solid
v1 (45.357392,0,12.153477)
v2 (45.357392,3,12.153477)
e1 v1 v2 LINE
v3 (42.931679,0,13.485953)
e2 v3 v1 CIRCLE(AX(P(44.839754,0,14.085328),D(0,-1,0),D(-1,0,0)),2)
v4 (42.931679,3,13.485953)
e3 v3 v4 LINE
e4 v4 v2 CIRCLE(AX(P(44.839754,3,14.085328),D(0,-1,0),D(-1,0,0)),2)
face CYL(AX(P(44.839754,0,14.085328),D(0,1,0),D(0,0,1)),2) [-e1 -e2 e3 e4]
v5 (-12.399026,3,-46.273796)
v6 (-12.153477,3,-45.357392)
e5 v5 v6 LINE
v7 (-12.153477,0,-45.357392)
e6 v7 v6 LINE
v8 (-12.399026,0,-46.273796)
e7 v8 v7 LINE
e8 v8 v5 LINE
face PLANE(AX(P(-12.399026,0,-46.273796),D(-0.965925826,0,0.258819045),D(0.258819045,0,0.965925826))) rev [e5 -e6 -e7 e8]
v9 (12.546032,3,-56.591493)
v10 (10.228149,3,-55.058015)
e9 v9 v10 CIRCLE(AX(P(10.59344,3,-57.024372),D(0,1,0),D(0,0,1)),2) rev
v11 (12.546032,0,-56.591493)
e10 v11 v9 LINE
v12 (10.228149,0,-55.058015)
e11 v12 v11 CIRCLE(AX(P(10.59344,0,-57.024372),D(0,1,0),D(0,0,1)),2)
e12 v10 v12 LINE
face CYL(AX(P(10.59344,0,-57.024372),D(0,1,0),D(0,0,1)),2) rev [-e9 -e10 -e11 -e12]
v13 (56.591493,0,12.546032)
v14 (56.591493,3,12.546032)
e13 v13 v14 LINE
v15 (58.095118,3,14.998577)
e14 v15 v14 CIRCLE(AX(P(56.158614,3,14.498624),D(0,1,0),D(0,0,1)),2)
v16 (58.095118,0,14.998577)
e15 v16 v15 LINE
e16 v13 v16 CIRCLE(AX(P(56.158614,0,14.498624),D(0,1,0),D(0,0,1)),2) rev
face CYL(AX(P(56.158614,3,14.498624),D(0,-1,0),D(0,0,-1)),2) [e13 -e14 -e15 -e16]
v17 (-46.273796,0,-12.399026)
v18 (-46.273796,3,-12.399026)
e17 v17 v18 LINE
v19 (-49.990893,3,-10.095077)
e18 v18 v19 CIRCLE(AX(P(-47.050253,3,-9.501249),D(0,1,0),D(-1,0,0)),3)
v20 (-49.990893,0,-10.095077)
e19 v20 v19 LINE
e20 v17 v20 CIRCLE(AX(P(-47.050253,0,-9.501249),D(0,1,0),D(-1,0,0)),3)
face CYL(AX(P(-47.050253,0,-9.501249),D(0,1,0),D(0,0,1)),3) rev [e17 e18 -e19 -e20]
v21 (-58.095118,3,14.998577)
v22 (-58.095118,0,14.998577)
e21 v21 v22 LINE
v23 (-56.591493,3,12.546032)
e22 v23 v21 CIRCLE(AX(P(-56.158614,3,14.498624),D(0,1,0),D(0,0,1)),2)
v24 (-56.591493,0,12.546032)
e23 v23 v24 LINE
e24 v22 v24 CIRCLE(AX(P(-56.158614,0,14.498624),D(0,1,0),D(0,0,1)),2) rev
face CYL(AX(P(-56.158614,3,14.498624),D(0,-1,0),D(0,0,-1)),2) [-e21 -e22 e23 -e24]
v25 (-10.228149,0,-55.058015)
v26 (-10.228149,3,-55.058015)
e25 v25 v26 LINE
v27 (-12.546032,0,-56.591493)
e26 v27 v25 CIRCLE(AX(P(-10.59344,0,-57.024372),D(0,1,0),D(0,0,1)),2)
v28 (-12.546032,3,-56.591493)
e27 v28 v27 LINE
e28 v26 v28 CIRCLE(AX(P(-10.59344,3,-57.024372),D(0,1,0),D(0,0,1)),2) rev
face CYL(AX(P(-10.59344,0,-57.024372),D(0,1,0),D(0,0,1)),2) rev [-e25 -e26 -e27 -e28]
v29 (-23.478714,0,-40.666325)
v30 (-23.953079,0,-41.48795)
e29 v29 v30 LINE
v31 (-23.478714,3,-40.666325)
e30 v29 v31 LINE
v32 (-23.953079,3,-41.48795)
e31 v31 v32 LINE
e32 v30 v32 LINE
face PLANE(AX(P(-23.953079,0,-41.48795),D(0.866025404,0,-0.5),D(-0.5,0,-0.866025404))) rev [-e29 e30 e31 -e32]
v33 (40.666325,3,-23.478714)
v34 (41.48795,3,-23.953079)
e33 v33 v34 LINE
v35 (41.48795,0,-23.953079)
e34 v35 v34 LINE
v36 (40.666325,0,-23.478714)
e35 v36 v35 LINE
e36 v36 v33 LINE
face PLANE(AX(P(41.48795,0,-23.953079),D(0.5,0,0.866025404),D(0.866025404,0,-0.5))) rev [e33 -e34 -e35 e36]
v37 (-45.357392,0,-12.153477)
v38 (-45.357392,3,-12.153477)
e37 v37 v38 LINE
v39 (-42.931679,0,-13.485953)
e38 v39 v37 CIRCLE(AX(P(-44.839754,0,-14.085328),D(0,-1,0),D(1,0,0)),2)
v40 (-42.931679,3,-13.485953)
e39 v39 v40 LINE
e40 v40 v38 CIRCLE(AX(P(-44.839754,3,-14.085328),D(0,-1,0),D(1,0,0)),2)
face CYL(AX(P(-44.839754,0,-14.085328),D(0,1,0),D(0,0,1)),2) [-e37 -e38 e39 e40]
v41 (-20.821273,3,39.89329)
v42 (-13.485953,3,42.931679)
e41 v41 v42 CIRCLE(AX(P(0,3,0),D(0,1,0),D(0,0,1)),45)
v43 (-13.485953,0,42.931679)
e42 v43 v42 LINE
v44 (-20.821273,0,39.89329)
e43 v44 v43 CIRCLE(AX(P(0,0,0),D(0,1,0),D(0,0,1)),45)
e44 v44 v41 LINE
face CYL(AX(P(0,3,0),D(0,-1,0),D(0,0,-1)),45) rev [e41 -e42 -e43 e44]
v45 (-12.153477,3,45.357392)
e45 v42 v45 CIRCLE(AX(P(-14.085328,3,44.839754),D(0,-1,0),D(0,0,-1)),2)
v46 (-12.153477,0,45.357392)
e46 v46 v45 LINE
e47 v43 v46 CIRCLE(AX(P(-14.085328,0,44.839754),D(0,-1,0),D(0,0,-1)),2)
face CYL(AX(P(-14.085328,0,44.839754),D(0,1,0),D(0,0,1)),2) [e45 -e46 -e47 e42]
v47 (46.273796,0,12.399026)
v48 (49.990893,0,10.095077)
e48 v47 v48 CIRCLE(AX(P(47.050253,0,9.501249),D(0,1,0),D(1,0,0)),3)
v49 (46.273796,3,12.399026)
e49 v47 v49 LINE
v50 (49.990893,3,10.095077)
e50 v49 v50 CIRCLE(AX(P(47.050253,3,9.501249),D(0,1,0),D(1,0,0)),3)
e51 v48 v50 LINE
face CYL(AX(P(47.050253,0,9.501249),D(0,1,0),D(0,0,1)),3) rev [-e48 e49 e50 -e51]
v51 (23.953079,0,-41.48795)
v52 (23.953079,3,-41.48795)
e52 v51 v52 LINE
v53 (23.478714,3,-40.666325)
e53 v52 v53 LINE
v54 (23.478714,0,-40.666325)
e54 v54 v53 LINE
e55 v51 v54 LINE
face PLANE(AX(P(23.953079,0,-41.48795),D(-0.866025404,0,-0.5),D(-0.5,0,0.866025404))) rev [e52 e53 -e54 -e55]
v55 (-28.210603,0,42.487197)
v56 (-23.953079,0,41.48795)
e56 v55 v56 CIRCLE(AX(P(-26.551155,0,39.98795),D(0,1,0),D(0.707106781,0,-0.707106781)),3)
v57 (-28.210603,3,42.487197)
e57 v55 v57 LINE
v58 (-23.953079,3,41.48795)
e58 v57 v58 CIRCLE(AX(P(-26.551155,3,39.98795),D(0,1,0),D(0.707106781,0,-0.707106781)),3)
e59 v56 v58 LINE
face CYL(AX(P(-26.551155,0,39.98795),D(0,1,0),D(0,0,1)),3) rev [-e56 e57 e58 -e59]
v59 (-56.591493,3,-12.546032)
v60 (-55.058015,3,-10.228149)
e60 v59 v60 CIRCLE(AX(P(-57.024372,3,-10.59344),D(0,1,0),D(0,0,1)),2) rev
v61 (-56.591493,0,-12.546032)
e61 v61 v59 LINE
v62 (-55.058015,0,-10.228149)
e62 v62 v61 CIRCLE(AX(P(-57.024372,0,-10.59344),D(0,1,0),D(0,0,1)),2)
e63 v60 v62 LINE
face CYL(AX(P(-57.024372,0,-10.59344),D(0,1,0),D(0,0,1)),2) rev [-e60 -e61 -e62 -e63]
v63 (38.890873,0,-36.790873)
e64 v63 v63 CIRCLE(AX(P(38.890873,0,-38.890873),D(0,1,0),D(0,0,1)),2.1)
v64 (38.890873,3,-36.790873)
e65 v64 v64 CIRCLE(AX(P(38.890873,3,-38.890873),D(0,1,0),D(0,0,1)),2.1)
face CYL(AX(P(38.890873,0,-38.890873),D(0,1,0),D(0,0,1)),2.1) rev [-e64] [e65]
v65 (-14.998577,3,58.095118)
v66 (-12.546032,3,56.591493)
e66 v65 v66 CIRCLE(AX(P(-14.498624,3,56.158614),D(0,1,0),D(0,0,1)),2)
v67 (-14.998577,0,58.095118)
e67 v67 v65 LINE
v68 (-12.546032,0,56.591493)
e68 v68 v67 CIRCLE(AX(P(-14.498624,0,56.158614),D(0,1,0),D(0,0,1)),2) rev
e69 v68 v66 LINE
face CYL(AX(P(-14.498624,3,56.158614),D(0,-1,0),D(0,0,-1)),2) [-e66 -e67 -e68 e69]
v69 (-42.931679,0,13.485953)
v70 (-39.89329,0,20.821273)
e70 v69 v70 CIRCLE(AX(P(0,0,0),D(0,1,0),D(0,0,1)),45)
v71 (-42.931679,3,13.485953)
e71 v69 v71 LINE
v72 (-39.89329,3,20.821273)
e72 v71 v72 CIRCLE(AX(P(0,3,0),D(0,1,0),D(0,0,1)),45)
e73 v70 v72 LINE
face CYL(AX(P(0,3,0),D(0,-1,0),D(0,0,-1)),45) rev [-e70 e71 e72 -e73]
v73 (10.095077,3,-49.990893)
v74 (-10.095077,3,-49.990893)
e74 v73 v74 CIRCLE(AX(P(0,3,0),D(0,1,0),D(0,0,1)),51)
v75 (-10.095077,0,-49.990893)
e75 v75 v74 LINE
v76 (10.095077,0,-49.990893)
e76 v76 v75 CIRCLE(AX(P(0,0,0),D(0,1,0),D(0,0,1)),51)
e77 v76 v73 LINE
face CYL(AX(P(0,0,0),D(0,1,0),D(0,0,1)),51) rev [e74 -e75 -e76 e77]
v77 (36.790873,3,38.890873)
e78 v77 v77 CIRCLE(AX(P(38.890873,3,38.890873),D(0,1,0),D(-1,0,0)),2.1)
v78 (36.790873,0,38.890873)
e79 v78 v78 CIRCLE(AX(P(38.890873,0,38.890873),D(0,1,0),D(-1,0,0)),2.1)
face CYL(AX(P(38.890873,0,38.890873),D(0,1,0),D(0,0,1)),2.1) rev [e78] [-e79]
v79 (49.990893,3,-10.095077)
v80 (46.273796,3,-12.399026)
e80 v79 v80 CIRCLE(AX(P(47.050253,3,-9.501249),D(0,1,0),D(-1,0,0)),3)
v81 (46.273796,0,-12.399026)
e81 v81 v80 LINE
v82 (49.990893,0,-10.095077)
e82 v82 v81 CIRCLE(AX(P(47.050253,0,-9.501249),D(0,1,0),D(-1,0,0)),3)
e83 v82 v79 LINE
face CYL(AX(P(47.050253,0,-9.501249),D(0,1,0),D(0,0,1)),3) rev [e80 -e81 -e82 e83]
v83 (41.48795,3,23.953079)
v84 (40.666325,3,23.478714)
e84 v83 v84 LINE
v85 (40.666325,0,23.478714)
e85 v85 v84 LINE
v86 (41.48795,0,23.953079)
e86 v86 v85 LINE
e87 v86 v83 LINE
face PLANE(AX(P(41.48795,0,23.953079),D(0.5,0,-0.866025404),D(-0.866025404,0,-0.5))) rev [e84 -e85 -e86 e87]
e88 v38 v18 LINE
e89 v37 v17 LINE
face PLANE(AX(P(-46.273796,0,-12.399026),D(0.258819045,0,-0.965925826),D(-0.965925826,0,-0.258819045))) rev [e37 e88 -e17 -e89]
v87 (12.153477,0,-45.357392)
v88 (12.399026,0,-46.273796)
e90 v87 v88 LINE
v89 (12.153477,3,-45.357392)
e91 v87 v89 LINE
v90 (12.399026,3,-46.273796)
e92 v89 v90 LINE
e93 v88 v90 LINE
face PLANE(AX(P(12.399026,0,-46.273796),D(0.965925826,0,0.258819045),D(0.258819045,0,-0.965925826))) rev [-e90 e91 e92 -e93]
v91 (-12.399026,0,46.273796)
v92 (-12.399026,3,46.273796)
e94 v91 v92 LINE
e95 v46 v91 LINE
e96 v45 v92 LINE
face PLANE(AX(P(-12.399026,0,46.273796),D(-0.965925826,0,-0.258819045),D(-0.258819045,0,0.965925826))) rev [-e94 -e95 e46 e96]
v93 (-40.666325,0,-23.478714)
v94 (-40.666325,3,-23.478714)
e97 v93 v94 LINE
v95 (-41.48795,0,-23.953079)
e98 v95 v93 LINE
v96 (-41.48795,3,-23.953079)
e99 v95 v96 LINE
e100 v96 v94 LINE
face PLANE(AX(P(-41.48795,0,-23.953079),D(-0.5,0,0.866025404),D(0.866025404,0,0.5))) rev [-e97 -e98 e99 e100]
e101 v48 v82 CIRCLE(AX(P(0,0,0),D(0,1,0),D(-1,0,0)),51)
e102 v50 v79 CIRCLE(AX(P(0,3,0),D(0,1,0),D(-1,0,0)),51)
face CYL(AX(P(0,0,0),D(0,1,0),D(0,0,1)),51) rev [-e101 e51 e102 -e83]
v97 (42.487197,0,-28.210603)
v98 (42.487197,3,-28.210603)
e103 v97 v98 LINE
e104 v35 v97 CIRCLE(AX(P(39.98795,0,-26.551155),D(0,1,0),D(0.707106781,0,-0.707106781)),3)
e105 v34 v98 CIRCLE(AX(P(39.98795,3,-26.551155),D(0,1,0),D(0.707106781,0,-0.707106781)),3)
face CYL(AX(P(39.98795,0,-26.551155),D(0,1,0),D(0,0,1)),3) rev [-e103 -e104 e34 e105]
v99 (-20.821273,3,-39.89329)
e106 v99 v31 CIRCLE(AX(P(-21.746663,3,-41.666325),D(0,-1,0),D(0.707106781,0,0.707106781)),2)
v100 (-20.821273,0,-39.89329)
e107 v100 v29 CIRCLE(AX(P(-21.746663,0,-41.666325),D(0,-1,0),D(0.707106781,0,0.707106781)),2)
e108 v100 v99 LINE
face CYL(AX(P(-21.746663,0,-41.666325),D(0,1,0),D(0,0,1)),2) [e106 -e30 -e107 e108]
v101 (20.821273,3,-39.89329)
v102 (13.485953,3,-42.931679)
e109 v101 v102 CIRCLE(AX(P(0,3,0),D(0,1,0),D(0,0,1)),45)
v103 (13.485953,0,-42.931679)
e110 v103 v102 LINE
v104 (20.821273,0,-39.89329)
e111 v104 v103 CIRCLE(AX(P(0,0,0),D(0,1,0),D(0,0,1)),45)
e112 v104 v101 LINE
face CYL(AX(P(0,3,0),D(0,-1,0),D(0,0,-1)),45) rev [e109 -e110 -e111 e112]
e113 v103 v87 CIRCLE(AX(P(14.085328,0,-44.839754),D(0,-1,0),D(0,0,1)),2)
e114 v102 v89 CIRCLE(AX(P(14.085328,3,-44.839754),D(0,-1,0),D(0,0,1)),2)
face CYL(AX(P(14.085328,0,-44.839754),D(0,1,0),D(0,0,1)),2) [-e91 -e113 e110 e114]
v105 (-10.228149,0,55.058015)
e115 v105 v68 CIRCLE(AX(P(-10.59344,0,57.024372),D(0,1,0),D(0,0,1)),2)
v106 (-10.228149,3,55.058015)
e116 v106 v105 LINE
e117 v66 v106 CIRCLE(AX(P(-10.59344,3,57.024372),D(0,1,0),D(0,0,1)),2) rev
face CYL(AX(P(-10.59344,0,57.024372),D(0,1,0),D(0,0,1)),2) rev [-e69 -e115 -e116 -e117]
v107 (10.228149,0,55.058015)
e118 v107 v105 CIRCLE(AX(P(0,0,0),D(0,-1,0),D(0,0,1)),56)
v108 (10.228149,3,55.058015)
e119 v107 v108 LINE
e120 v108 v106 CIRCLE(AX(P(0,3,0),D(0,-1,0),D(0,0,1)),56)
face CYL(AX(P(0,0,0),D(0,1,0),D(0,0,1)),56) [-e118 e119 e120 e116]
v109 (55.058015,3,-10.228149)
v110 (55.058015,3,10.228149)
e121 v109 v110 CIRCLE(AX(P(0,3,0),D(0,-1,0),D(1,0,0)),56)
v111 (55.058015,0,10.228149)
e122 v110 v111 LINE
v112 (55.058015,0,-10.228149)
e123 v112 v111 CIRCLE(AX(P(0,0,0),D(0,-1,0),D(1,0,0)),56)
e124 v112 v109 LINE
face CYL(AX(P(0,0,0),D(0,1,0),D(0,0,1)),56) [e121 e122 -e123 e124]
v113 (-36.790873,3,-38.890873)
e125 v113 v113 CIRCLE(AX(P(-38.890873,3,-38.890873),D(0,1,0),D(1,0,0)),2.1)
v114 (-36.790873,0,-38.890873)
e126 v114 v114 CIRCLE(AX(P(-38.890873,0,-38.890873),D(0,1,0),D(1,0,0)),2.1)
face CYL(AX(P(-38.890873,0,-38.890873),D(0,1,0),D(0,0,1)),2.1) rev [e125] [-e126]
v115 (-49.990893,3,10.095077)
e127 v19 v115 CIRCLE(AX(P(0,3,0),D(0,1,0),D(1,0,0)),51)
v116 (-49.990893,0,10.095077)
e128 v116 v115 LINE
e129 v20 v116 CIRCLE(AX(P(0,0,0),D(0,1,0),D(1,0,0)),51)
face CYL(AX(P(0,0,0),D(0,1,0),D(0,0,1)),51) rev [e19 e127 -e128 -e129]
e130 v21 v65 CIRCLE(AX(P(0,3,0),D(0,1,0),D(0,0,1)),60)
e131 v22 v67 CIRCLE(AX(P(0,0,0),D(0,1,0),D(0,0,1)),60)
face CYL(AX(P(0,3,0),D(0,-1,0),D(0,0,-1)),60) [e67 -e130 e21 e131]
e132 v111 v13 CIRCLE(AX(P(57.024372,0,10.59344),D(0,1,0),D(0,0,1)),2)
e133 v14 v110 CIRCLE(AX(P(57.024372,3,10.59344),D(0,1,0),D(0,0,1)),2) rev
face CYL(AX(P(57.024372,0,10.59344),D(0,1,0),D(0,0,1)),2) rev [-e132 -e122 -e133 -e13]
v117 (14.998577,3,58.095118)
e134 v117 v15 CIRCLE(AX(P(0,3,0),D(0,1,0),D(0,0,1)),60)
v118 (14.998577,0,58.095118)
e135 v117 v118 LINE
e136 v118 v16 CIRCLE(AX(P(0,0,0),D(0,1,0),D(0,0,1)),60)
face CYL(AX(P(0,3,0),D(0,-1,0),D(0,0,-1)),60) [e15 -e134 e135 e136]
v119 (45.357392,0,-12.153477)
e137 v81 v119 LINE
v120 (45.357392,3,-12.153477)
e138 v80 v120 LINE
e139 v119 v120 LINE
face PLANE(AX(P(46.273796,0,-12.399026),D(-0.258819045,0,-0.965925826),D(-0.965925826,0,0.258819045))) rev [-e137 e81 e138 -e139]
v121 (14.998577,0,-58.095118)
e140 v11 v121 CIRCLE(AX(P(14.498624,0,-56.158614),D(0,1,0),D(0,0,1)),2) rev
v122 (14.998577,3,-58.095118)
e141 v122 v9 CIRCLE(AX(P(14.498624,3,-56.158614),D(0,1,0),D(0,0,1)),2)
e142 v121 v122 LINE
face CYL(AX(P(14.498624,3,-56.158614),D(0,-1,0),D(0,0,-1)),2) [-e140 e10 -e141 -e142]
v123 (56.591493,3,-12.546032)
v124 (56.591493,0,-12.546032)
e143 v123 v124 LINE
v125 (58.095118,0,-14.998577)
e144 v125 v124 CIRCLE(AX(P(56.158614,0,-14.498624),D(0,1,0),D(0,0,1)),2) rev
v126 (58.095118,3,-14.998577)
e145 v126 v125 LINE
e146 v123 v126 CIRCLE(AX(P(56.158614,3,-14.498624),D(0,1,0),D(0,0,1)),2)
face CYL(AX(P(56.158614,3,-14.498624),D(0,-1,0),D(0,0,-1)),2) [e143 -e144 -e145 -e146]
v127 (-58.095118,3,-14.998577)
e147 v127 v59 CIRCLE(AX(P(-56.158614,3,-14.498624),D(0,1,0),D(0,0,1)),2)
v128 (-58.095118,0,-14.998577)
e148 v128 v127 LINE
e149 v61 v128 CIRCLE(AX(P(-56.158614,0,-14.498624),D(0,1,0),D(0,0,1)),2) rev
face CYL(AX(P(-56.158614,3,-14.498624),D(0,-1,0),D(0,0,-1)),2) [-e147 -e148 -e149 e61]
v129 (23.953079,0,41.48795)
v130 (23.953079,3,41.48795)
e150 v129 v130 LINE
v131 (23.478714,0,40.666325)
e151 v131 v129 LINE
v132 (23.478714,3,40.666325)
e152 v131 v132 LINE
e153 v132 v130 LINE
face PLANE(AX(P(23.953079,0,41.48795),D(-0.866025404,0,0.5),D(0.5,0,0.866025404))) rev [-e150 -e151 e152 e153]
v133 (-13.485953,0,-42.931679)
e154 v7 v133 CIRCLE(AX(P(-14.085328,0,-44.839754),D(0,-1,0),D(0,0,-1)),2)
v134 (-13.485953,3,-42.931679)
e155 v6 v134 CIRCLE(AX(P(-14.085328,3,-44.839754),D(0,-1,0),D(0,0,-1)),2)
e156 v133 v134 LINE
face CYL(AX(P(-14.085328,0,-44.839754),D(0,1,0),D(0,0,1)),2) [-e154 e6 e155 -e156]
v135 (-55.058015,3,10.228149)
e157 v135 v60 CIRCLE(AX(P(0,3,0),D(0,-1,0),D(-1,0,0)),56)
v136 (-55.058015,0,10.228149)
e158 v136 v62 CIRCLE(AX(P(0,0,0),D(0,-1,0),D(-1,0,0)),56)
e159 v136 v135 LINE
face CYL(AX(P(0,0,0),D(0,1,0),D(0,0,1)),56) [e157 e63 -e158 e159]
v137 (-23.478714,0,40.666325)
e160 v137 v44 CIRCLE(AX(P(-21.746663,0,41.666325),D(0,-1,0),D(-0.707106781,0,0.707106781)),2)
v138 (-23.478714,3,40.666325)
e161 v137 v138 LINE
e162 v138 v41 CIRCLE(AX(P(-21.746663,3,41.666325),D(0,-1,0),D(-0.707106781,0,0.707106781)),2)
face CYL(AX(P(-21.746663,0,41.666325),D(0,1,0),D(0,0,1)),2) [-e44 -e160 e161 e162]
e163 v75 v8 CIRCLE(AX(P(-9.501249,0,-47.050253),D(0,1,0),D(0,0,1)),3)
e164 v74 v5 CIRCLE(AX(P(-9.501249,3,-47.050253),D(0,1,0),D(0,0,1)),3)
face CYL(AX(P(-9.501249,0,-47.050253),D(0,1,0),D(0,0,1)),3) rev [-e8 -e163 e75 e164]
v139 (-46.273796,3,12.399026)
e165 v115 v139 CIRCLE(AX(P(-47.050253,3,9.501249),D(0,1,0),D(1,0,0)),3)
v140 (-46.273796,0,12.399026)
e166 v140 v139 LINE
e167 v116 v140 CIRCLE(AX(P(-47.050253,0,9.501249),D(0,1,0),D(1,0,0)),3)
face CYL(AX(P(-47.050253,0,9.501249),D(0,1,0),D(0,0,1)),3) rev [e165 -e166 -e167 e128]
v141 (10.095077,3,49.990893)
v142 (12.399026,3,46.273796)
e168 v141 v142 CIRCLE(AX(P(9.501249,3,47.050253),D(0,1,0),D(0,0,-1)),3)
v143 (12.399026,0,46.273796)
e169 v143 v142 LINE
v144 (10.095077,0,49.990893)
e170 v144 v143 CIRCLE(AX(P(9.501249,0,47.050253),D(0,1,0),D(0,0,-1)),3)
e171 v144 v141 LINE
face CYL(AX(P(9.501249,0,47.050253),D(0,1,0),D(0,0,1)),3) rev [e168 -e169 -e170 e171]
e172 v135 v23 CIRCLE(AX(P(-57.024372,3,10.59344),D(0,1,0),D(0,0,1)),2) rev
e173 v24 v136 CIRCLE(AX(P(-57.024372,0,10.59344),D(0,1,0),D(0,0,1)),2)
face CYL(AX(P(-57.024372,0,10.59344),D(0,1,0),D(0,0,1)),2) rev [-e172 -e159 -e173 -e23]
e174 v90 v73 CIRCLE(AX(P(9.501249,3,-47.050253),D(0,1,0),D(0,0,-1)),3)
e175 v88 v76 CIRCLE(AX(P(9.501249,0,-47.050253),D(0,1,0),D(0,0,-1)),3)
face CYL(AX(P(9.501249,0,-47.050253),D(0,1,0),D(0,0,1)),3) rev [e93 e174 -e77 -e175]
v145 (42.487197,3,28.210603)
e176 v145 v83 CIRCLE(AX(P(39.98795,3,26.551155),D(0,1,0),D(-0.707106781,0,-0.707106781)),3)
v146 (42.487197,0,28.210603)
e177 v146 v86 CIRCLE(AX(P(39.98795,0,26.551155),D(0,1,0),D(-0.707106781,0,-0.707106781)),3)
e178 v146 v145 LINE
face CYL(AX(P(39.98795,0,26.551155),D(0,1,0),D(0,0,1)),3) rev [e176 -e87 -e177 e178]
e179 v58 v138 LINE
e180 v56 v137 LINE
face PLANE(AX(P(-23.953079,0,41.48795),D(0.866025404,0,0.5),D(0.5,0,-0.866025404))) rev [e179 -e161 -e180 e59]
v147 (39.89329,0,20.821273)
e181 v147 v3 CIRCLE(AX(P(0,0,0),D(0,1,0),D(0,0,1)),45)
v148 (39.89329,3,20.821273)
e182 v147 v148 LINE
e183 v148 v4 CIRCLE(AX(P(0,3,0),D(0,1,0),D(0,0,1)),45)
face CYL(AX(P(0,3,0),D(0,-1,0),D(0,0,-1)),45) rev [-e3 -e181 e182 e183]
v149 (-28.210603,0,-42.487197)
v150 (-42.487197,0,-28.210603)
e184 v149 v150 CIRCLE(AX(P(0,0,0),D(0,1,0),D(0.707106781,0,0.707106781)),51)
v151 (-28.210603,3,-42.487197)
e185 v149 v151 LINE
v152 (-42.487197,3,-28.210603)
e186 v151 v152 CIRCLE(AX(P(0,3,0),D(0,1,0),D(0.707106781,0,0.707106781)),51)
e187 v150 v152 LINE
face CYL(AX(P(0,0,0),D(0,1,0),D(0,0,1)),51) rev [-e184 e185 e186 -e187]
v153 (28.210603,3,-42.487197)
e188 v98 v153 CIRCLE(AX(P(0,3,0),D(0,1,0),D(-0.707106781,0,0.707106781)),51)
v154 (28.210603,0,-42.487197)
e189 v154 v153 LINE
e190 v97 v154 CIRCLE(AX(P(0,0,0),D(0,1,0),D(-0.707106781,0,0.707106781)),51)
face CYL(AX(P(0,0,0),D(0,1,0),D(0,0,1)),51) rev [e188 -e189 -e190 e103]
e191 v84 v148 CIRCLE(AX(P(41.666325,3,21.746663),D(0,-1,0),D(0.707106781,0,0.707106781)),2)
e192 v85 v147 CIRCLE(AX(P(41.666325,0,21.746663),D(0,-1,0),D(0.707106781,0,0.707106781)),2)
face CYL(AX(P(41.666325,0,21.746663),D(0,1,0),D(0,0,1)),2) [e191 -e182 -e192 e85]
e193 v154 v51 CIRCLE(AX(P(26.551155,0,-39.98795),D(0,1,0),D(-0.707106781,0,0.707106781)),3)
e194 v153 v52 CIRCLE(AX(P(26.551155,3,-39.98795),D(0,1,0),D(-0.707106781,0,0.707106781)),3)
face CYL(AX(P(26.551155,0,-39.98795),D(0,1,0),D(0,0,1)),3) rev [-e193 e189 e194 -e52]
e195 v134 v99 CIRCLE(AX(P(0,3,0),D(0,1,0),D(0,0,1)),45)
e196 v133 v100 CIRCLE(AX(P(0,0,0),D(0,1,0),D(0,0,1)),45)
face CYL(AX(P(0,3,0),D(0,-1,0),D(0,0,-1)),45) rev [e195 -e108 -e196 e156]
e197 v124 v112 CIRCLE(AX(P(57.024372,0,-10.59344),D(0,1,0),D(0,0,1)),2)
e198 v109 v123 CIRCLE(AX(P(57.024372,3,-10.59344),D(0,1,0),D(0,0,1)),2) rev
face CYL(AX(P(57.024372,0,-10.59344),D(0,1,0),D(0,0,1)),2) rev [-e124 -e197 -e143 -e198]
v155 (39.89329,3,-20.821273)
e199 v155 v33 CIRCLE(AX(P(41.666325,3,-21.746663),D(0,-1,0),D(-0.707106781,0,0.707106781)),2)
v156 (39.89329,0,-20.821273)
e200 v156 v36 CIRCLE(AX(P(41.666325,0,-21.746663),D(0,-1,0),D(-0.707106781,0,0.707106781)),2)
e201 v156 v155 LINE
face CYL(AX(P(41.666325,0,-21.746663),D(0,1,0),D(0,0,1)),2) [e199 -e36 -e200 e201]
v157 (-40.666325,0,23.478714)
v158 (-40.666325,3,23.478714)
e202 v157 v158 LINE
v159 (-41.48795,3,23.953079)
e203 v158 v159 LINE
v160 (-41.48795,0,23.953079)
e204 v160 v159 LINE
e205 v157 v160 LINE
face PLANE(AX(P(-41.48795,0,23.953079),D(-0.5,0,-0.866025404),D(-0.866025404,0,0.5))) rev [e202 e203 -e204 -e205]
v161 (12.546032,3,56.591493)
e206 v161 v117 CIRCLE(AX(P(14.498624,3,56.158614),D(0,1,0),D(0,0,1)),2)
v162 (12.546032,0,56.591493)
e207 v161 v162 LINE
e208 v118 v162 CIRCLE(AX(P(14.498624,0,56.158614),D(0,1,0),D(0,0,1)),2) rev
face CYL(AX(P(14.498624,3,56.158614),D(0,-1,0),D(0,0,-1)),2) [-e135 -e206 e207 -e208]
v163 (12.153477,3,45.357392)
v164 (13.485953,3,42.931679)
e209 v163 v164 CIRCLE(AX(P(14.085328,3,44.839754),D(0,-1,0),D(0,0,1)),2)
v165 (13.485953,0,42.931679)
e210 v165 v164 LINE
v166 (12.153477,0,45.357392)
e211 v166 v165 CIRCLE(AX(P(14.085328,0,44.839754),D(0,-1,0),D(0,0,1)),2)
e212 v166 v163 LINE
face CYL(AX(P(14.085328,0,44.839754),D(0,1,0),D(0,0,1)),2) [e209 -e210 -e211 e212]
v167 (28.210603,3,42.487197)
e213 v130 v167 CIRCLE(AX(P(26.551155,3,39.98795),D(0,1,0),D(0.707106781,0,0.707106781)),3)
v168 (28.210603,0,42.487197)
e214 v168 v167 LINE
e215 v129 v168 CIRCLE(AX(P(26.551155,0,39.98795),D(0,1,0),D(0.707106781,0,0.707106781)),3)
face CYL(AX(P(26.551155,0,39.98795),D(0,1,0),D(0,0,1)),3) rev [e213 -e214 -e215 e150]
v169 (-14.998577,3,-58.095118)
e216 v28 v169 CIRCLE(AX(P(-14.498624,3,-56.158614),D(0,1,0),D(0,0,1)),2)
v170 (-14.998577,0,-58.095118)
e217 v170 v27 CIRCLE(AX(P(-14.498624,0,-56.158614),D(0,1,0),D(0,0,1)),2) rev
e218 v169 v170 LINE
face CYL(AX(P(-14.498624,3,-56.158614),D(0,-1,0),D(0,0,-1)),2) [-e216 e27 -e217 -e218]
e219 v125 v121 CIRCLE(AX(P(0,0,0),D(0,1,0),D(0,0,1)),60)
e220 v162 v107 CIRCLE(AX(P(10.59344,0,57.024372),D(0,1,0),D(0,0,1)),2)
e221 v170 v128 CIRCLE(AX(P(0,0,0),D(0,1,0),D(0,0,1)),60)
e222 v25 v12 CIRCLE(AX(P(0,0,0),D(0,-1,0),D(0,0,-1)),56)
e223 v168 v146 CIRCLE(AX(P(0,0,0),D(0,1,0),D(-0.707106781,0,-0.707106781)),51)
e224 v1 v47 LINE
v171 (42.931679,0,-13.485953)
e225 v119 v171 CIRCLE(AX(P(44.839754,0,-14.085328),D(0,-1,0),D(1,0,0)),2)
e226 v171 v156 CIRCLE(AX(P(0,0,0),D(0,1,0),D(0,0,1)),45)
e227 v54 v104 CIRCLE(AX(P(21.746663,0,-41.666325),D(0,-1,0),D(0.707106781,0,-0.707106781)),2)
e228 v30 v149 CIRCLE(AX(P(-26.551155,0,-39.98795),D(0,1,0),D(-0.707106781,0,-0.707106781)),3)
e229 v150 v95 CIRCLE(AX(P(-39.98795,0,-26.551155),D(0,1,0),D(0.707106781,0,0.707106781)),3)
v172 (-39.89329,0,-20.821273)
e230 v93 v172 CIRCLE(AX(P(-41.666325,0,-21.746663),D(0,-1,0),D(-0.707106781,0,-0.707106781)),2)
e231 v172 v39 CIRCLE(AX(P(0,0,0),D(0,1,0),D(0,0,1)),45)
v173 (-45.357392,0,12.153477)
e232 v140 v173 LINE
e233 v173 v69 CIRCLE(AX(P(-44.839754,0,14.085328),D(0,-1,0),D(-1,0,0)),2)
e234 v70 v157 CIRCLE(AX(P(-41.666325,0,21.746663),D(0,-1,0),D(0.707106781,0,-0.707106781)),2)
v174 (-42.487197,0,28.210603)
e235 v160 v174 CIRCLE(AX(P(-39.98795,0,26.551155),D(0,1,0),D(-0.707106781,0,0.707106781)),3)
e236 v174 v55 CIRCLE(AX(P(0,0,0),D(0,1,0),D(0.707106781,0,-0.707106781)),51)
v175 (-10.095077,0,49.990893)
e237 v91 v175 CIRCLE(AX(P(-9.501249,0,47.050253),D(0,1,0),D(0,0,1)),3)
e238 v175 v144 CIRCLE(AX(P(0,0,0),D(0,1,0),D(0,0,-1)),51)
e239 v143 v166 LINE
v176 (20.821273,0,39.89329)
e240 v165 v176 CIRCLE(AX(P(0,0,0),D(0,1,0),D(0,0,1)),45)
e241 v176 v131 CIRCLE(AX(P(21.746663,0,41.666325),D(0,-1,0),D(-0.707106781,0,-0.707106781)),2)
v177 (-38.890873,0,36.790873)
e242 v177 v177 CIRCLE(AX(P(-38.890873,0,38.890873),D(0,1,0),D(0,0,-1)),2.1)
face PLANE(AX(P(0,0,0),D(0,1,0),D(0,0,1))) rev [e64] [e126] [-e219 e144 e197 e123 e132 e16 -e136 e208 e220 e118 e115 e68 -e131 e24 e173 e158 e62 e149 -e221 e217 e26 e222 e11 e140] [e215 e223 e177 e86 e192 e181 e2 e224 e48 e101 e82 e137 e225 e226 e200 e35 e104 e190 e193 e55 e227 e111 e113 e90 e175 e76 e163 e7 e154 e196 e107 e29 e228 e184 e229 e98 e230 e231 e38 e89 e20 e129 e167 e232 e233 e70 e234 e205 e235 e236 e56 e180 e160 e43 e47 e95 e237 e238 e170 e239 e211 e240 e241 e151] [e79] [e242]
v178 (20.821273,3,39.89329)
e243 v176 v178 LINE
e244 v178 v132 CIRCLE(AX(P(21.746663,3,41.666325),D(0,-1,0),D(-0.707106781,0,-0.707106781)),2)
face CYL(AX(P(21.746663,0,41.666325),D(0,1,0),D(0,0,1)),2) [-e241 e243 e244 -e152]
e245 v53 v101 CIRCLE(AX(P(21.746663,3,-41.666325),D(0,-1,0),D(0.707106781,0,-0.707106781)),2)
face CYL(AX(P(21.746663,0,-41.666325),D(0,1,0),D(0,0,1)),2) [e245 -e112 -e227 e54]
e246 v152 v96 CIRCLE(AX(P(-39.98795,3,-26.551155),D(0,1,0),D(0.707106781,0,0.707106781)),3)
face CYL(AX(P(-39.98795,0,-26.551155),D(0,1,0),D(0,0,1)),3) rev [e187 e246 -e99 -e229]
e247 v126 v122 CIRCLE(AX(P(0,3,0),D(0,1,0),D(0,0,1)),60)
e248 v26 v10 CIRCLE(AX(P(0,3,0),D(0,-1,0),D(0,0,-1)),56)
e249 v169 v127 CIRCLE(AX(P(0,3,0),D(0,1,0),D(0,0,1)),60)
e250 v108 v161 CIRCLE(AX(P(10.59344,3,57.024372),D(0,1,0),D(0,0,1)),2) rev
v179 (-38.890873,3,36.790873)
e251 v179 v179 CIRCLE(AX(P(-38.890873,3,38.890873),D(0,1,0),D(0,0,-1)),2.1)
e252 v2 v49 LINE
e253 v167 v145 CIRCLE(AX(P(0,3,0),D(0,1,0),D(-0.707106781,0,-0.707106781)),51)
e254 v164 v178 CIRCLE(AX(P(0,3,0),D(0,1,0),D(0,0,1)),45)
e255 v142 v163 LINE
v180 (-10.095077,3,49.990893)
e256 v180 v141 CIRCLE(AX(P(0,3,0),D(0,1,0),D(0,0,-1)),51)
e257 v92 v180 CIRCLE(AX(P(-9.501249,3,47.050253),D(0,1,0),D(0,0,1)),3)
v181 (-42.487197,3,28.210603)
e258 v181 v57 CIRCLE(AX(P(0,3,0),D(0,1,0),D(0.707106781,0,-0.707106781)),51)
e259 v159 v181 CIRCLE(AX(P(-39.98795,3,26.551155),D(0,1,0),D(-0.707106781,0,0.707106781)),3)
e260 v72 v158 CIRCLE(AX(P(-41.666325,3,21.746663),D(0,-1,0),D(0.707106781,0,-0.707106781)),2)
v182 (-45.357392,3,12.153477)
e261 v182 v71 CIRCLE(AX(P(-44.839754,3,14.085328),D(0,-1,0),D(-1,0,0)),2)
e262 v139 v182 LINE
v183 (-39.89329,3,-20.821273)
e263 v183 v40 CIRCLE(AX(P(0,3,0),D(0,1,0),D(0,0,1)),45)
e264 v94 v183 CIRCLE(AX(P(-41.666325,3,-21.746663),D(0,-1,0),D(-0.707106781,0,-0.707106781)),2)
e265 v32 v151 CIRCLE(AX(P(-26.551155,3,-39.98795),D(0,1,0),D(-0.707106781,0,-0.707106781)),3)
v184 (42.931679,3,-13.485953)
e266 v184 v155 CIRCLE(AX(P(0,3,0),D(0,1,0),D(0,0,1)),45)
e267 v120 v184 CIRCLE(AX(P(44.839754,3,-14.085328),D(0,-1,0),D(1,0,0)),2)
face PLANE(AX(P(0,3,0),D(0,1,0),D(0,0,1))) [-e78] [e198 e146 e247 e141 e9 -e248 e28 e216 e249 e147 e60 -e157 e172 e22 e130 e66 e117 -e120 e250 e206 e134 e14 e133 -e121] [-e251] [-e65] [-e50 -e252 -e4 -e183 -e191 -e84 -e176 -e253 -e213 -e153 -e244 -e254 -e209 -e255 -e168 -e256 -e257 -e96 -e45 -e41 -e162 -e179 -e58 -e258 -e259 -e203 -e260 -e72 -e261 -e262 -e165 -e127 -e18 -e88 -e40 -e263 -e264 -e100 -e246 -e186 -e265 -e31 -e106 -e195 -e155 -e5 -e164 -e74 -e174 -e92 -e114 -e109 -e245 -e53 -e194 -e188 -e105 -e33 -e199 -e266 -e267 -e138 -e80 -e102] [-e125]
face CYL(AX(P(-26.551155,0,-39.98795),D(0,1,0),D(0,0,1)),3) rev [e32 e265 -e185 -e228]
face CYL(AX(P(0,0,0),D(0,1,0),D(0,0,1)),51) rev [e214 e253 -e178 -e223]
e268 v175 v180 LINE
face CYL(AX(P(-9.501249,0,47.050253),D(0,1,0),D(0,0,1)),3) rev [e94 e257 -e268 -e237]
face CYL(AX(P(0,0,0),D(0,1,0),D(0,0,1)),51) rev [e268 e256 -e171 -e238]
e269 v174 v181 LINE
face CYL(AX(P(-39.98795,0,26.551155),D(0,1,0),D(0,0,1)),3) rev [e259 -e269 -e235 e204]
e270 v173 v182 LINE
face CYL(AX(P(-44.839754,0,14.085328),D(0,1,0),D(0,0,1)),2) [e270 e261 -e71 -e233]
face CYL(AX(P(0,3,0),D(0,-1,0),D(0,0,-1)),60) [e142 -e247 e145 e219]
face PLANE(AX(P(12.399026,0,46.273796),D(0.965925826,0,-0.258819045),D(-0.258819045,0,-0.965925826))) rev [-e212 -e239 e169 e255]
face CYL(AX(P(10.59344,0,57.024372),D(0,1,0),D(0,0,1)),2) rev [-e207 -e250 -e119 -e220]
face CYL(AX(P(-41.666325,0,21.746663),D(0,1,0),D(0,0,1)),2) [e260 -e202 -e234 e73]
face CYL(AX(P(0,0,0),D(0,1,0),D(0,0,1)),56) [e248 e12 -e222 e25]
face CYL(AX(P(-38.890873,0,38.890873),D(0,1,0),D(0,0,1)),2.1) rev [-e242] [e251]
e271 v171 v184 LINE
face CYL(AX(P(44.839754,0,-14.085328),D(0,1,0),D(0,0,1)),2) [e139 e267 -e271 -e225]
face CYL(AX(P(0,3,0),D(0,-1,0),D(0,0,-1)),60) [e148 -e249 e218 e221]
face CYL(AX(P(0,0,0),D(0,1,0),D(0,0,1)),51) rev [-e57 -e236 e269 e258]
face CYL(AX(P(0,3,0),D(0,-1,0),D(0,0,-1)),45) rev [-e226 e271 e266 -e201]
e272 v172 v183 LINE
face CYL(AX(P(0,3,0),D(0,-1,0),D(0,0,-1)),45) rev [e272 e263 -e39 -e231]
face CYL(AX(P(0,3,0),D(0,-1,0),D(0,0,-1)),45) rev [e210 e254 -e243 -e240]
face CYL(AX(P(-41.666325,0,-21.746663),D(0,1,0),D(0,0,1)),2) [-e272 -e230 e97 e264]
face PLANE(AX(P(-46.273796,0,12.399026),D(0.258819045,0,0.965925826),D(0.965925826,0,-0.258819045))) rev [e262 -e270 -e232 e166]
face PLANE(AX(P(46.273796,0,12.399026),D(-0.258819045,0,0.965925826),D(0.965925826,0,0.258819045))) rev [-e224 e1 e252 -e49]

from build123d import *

# Parameters (mm, degrees)
SKETCH1_R                       = 60
SKETCH1_R_2                     = 45
BOSS_EXTRUDE1_DEPTH             = 3
CUT_EXTRUDE1_DEPTH              = 85.905830189
CIRPATTERN1_COUNT               = 8
SKETCH3_R                       = 2.1
CUT_EXTRUDE2_DEPTH              = 85.905830189
CIRPATTERN2_COUNT               = 4
SCHNITT_LINEAR_AUSTRAGEN1_DEPTH = 85.905830189
VERRUNDUNG2_R                   = 2
KREISMUSTER7_COUNT              = 4
VERRUNDUNG2_OF_KREISMUSTER7_R   = 2


with BuildPart() as part:
    # Sketch1 → Boss-Extrude1 (new body)
    with BuildSketch(Plane(origin=(0, 0, 0), x_dir=(1, 0, 0), z_dir=(0, 1, 0))):
        with Locations(Location((0, 0, 0), (0, 0, 270))):
            Circle(SKETCH1_R)
        with Locations(Location((0, 0, 0), (0, 0, 270))):
            Circle(SKETCH1_R_2, mode=Mode.SUBTRACT)
    extrude(amount=BOSS_EXTRUDE1_DEPTH)

    # Sketch2 → Cut-Extrude1 (cut, through all)
    with BuildSketch(Plane(origin=(0, 3, 0), x_dir=(1, 0, 0), z_dir=(0, 1, 0))):
        with BuildLine():
            Line((12.399026137, 46.273795509), (12.153476553, 45.357391985))
            ThreePointArc((12.153476553, 45.357391985), (12.332388249, 43.876840862), (13.485952537, 42.931679261))
            Line((13.485952537, 42.931679261), (-13.485952537, 42.931679261))
            ThreePointArc((-13.485952537, 42.931679261), (-12.332388249, 43.876840862), (-12.153476553, 45.357391985))
            Line((-12.153476553, 45.357391985), (-12.399026137, 46.273795509))
            ThreePointArc((-12.399026137, 46.273795509), (-12.051156799, 48.63074892), (-10.0950767, 49.990893435))
            ThreePointArc((-10.0950767, 49.990893435), (0, 51), (10.0950767, 49.990893435))
            ThreePointArc((10.0950767, 49.990893435), (12.051156799, 48.63074892), (12.399026137, 46.273795509))
        make_face()
    cut_extrude1 = extrude(amount=-CUT_EXTRUDE1_DEPTH, mode=Mode.SUBTRACT)

    # CirPattern1: Cut-Extrude1 ×8 about axis
    cirpattern1_axis = Axis((0, 0, 0), (0, 1, 0))
    for i in range(1, CIRPATTERN1_COUNT):
        add(cut_extrude1.rotate(cirpattern1_axis, i * 360 / CIRPATTERN1_COUNT), mode=Mode.SUBTRACT)

    # Sketch3 → Cut-Extrude2 (cut, through all)
    with BuildSketch(Plane(origin=(0, 3, 0), x_dir=(1, 0, 0), z_dir=(0, 1, 0))):
        with Locations(Location((38.890872965, 38.890872965, 0), (0, 0, 270))):
            Circle(SKETCH3_R)
    cut_extrude2 = extrude(amount=-CUT_EXTRUDE2_DEPTH, mode=Mode.SUBTRACT)

    # CirPattern2: Cut-Extrude2 ×4 about axis
    cirpattern2_axis = Axis((0, 0, 0), (0, 1, 0))
    for i in range(1, CIRPATTERN2_COUNT):
        add(cut_extrude2.rotate(cirpattern2_axis, i * 360 / CIRPATTERN2_COUNT), mode=Mode.SUBTRACT)

    # Skizze1 → Schnitt-Linear austragen1 (cut, through all)
    with BuildSketch(Plane(origin=(0, 3, 0), x_dir=(1, 0, 0), z_dir=(0, 1, 0))):
        with BuildLine():
            Line((-12.986376836, 58.577760427), (-12.120618381, 54.672576399))
            ThreePointArc((-12.120618381, 54.672576399), (0, 56), (12.120618381, 54.672576399))
            Line((12.120618381, 54.672576399), (12.986376836, 58.577760427))
            ThreePointArc((12.986376836, 58.577760427), (0, 60), (-12.986376836, 58.577760427))
        make_face()
    schnitt_linear_austragen1 = extrude(amount=-SCHNITT_LINEAR_AUSTRAGEN1_DEPTH, mode=Mode.SUBTRACT)

    # Verrundung2
    verrundung2_edges = [part.edges().sort_by_distance(p)[0] for p in [
        (-12.986376836, 1.5, -58.577760427),
        (-12.120618381, 1.5, -54.672576399),
        (12.986376836, 1.5, -58.577760427),
        (12.120618381, 1.5, -54.672576399),
    ]]
    fillet(verrundung2_edges, radius=VERRUNDUNG2_R - 0.0001)  # a hair under: the kernel refuses the full size

    # Kreismuster7: Schnitt-Linear austragen1 ×4 about axis
    kreismuster7_axis = Axis((0, 0, 0), (0, 1, 0))
    for i in range(1, KREISMUSTER7_COUNT):
        add(schnitt_linear_austragen1.rotate(kreismuster7_axis, i * 360 / KREISMUSTER7_COUNT), mode=Mode.SUBTRACT)

    # Verrundung2 of Kreismuster7
    verrundung2_of_kreismuster7_edges = [part.edges().sort_by_distance(p)[0] for p in [
        (-58.577760427, 1.5, 12.986376836),
        (-54.672576399, 1.5, 12.120618381),
        (-58.577760427, 1.5, -12.986376836),
        (-54.672576399, 1.5, -12.120618381),
        (12.986376836, 1.5, 58.577760427),
        (12.120618381, 1.5, 54.672576399),
        (-12.986376836, 1.5, 58.577760427),
        (-12.120618381, 1.5, 54.672576399),
        (58.577760427, 1.5, -12.986376836),
        (54.672576399, 1.5, -12.120618381),
        (58.577760427, 1.5, 12.986376836),
        (54.672576399, 1.5, 12.120618381),
    ]]
    fillet(verrundung2_of_kreismuster7_edges, radius=VERRUNDUNG2_OF_KREISMUSTER7_R - 0.0001)  # a hair under: the kernel refuses the full size


solid = part.part
